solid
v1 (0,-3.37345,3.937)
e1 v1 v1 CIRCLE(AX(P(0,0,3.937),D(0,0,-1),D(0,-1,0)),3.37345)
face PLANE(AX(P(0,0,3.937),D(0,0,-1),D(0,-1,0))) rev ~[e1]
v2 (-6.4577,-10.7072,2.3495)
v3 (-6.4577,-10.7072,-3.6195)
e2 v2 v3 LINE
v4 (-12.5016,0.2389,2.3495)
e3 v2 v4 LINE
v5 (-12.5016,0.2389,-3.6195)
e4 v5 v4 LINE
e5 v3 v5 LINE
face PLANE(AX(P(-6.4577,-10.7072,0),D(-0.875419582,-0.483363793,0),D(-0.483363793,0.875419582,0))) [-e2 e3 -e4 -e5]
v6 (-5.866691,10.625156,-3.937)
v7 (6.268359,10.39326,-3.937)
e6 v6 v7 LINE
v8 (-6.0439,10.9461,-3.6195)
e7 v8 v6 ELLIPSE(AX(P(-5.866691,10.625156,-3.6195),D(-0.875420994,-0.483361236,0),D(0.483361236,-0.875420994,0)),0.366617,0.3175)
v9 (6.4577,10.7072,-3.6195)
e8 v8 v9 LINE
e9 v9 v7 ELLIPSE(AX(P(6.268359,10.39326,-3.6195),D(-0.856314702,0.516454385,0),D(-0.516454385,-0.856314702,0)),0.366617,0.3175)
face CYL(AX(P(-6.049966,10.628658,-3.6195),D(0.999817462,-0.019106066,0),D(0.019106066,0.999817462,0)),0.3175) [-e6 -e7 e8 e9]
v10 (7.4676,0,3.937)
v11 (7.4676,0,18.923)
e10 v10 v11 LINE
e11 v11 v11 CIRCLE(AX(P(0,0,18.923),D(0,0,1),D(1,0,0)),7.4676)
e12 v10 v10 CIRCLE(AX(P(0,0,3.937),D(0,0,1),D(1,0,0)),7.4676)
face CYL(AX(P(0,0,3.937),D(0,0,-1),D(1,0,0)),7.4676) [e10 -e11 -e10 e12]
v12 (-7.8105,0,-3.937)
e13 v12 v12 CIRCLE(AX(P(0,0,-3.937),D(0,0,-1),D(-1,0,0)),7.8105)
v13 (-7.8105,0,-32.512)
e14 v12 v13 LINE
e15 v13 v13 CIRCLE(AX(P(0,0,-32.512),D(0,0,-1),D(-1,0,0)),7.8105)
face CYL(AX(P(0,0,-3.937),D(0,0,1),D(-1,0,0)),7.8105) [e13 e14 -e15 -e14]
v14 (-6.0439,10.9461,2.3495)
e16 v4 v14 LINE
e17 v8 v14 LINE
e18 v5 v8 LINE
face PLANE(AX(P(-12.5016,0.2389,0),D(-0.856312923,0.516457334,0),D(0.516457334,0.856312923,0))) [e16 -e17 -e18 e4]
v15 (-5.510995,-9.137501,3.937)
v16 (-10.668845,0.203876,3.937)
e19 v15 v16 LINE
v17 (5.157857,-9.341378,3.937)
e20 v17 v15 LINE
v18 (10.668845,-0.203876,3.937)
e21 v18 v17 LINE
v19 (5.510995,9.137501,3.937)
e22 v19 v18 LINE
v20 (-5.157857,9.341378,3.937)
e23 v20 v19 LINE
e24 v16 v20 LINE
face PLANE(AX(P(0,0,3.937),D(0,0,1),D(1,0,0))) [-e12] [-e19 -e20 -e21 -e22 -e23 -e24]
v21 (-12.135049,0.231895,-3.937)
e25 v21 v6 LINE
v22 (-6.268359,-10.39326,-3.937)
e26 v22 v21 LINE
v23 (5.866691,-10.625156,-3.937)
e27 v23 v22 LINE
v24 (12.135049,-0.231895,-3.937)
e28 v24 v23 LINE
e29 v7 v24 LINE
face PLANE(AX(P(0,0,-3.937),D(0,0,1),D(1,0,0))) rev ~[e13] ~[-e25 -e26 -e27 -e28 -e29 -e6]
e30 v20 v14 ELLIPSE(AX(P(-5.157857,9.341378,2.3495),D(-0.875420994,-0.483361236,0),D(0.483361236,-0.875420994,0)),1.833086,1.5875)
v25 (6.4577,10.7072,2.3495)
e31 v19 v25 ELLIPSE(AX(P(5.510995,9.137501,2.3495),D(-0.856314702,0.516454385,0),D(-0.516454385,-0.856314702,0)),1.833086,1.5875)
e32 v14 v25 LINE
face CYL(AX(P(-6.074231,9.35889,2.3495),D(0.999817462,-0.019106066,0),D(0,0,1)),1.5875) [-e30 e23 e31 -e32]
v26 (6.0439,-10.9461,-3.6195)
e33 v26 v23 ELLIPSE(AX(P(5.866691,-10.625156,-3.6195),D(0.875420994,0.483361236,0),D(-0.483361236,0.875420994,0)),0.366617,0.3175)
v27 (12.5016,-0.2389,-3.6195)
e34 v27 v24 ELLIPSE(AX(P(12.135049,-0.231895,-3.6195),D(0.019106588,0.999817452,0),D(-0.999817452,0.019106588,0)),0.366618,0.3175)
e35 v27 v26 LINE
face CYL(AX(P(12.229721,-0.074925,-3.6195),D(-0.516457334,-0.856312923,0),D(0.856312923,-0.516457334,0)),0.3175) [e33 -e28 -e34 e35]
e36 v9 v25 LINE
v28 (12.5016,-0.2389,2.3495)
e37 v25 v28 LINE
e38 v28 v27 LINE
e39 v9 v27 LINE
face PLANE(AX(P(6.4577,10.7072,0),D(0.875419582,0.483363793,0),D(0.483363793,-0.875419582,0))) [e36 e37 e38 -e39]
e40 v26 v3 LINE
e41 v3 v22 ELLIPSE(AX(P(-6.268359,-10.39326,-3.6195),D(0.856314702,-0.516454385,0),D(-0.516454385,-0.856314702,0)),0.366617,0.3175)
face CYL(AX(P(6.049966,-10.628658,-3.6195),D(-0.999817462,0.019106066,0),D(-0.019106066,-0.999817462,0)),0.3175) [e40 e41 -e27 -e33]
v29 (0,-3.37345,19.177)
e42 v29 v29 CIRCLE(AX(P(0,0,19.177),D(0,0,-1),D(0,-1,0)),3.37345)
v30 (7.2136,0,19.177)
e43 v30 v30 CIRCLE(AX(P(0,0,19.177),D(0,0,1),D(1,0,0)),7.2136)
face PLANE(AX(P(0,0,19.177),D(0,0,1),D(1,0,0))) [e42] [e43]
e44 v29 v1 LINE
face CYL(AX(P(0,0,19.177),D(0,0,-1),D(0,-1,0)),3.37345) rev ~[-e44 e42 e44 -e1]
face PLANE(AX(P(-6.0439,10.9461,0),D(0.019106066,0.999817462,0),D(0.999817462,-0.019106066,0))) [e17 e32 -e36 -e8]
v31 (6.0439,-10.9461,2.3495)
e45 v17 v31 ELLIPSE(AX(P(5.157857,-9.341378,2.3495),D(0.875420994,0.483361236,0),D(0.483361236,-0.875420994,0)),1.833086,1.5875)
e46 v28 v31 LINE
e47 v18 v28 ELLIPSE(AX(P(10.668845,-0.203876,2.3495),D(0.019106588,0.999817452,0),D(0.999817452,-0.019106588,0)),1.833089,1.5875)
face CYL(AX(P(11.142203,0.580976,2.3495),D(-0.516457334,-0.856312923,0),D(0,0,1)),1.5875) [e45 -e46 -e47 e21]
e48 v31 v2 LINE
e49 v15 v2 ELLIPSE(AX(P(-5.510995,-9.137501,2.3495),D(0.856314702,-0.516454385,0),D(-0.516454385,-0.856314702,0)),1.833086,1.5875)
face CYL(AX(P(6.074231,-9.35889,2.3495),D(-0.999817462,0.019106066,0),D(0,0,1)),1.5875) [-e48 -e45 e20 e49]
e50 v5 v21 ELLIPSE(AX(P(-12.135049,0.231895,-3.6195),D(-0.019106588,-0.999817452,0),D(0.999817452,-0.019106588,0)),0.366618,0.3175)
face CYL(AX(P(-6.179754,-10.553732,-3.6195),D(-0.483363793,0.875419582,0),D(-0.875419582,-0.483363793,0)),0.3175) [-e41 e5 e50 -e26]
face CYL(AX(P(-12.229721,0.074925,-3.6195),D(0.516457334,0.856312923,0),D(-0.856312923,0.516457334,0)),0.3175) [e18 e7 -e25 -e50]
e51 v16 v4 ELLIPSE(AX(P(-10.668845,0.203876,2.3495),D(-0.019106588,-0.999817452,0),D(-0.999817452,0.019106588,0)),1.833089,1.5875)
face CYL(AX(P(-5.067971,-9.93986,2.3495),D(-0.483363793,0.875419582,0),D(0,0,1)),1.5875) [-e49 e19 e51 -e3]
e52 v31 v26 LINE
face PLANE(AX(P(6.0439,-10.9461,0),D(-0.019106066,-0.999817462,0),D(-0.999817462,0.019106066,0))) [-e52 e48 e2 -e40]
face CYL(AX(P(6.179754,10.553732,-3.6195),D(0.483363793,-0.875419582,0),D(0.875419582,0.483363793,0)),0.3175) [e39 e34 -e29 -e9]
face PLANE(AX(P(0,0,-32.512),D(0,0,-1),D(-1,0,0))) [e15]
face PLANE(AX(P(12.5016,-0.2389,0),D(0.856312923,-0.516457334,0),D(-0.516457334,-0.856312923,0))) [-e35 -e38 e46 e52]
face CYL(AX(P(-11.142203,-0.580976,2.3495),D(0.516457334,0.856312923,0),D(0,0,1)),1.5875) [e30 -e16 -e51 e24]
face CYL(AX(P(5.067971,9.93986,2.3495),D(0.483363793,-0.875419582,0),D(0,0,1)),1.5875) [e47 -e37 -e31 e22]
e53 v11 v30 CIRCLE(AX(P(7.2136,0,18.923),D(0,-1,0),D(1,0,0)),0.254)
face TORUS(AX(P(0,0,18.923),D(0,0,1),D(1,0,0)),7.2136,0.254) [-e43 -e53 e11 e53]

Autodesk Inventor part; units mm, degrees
ref_plane "YZ Plane" through (0, 0, 0) normal (1, 0, 0) x (0, 1, 0)
ref_plane "XZ Plane" through (0, 0, 0) normal (0, 1, 0) x (-1, 0, 0)
ref_plane "XY Plane" through (0, 0, 0) normal (0, 0, 1) x (1, 0, 0)
sketch "Sketch1" plane through (0, 0, 0) normal (0, 0, 1) x (1, 0, 0)
  line L0 (6.4577, 10.7072) -> (12.5016, -0.2389)
  line L1 (12.5016, -0.2389) -> (6.0439, -10.9461)
  line L2 (6.0439, -10.9461) -> (-6.4577, -10.7072)
  line L3 (-6.4577, -10.7072) -> (-12.5016, 0.2389)
  line L4 (-12.5016, 0.2389) -> (-6.0439, 10.9461)
  line L5 (-6.0439, 10.9461) -> (6.4577, 10.7072)
  point P0 (0, 0)
  point P1 (0, 0)
  dimension "d0" = 25.0031
extrude "Extrusion1" add sketch "Sketch1" along normal mid plane 7.874
sketch "Sketch2" plane through (0, 0, 3.937) normal (0, 0, 1) x (1, 0, 0)
  circle A0 centre (0, 0) radius 7.4676
  dimension "d3" = 14.9352
extrude "Extrusion2" add sketch "Sketch2" along normal blind 15.24
fillet "Fillet1" radius 0.254 1 edges at (-7.4676, 0, 19.177)
sketch "Sketch3" plane through (0, 0, 19.177) normal (0, 0, 1) x (1, 0, 0)
  point P0 (0, 0)
  point P1 (0, 0)
hole "Hole1" at (0, 0, 19.177) at (0, 0, 19.177) direction (0, 0, -1) diameter 6.7469 depth 15.24
sketch "Sketch4" plane through (0, 0, -3.937) normal (0, 0, -1) x (-1, 0, 0)
  circle A0 centre (0, 0) radius 7.8105
  dimension "d15" = 15.621
extrude "Extrusion3" add sketch "Sketch4" along normal blind 28.575
thread "Thread1" size "5/8-11 UNC" class "2A" standard "ANSI Unified Screw Threads" length 19.05
thread "Thread2" size "10-24 UNC" class "2B" standard "ANSI Unified Screw Threads" length 25.4
fillet "Fillet2" radius 1.5875 6 edges at (9.4796, 5.2342, 3.937) (0.2069, 10.8267, 3.937) (9.2727, -5.5925, 3.937) (-0.2069, -10.8267, 3.937) (-9.4796, -5.2342, 3.937) (-9.2727, 5.5925, 3.937)
fillet "Fillet3" radius 0.3175 6 edges at (-0.2069, -10.8267, -3.937) (9.2727, -5.5925, -3.937) (9.4796, 5.2342, -3.937) (0.2069, 10.8267, -3.937) (-9.2727, 5.5925, -3.937) (-9.4796, -5.2342, -3.937)
